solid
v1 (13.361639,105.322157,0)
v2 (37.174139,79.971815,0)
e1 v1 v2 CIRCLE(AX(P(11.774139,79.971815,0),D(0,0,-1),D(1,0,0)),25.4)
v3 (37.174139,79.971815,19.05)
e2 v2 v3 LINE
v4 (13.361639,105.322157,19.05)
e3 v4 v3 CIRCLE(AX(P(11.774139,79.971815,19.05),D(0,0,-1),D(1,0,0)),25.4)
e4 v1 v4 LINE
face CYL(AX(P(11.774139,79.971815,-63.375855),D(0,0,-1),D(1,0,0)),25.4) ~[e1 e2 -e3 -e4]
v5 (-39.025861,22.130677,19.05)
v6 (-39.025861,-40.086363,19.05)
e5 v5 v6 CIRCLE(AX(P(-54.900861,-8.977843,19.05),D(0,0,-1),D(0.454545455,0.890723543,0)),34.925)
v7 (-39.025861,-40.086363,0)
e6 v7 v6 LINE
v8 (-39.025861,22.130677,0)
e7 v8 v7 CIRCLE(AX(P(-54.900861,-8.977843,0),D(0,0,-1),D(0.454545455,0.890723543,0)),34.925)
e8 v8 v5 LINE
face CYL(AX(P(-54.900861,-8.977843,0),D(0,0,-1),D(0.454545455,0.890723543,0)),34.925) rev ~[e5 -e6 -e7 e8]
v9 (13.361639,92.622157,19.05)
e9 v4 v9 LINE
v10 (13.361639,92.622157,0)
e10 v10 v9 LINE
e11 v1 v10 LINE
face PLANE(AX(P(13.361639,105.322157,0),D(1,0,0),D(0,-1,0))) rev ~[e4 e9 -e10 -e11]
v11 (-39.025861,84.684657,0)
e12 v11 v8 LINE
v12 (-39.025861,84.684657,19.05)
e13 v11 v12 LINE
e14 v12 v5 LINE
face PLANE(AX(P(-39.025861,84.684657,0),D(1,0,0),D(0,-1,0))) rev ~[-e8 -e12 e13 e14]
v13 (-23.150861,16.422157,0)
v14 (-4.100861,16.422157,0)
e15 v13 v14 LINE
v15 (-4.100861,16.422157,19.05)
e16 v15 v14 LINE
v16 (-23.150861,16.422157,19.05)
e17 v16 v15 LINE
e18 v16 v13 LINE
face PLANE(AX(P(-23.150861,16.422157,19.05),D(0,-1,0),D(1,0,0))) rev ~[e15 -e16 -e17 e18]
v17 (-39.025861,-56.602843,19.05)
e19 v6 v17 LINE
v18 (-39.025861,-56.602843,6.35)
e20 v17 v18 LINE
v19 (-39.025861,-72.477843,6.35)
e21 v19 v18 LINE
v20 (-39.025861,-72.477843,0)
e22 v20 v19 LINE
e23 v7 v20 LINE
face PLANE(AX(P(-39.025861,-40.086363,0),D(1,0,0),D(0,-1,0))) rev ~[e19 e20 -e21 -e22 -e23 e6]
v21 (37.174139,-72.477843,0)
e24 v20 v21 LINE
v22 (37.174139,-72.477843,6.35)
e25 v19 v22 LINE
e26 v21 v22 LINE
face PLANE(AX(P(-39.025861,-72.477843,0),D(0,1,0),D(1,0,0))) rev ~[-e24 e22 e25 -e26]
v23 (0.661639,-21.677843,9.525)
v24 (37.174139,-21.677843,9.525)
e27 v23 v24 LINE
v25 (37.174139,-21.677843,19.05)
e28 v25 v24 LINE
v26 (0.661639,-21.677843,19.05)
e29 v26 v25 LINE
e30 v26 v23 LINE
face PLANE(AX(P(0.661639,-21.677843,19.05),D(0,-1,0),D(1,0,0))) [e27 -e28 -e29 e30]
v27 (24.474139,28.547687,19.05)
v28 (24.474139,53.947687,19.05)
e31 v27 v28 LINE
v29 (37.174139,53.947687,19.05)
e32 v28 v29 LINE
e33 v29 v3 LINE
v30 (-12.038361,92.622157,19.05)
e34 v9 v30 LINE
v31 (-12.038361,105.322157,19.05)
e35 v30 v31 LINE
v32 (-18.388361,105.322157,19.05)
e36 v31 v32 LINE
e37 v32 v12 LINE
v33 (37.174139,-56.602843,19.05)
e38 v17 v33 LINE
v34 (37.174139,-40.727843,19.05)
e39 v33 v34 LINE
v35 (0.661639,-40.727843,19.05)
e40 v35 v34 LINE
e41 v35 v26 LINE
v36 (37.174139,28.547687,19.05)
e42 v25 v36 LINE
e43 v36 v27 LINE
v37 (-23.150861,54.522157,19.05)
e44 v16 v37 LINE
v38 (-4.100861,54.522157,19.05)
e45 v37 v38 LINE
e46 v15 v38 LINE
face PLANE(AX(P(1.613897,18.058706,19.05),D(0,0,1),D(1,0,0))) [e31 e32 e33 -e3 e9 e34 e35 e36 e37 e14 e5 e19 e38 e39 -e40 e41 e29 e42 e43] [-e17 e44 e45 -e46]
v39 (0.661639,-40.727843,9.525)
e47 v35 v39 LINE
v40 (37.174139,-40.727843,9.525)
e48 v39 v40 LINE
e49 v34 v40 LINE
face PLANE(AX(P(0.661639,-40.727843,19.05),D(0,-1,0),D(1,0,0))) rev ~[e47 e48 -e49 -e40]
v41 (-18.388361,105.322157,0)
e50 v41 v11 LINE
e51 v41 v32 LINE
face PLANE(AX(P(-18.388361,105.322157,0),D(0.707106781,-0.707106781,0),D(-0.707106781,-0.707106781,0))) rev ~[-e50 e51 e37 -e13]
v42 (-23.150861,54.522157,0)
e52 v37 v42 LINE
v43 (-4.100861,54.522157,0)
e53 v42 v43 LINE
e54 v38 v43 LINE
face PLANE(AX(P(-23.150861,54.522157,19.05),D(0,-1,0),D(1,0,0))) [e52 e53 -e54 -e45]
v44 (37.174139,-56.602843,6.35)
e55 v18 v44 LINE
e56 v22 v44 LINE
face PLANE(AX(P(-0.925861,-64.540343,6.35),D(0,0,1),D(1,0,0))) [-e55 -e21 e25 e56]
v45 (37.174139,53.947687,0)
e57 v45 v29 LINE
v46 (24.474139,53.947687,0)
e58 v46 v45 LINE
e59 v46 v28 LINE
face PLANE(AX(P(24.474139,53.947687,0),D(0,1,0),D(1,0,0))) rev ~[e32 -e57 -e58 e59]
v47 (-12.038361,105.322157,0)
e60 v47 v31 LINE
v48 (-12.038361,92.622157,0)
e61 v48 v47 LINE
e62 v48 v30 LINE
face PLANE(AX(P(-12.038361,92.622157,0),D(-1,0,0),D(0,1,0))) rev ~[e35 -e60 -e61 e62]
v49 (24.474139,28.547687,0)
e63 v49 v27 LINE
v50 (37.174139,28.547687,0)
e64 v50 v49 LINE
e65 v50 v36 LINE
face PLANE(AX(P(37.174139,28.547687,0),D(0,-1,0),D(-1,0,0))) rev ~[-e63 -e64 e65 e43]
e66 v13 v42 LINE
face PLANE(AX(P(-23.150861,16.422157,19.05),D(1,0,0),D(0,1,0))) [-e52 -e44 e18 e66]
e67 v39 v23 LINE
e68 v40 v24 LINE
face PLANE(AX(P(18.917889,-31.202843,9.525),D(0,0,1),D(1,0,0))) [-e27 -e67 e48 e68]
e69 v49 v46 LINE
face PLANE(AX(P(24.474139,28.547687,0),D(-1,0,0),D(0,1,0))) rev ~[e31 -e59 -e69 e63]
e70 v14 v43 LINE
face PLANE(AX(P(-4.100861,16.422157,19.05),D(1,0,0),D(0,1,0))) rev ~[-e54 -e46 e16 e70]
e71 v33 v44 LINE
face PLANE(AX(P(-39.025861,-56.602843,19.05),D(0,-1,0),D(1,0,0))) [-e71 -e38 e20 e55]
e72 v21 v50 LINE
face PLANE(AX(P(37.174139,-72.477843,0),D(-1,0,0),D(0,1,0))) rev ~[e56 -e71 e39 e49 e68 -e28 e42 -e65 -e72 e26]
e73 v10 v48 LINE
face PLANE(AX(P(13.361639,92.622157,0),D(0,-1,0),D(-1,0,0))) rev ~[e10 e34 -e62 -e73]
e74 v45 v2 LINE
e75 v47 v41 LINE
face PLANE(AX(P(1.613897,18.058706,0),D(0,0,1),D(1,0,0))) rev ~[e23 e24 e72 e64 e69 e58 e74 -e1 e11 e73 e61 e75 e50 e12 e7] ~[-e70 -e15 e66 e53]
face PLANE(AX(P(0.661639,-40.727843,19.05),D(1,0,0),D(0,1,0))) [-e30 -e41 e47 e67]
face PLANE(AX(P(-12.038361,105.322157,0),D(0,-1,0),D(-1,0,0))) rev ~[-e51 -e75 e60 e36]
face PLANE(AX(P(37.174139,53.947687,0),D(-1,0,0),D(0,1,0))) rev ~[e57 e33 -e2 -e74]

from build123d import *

# Parameters (mm, degrees)
F1_DEPTH    = 19.05
F2_W        = 76.2
F2_H        = 15.875
F3_DEPTH    = 12.7
F4_W        = 36.5125
F4_H        = 19.05
F5_DEPTH    = 9.525
F6_W        = 19.05
F6_H        = 38.1
F7_DEPTH    = 25.4
F8_T1_DEPTH = 145.8017104175


# Not quite as in the source:
# - a fillet or chamfer that OpenCascade refuses, or shapes differently, is made with other operations: its cross-section is extruded or revolved along the edge and cut away or added


with BuildPart() as f1:
    # F0 (on Top) → F1 (new body)
    with BuildSketch(Plane.XY):
        with BuildLine():
            Line((-39.025861299, -56.6028431063), (-39.025861299, -72.4778431063))
            Line((-39.025861299, -72.4778431063), (37.174138701, -72.4778431063))
            Line((37.174138701, -72.4778431063), (37.174138701, 28.547687456))
            Line((37.174138701, 28.547687456), (24.474138701, 28.547687456))
            Line((24.474138701, 28.547687456), (24.474138701, 53.947687456))
            Line((24.474138701, 53.947687456), (37.174138701, 53.947687456))
            Line((37.174138701, 53.947687456), (37.174138701, 105.3221568937))
            Line((37.174138701, 105.3221568937), (13.361638701, 105.3221568937))
            Line((13.361638701, 105.3221568937), (13.361638701, 92.6221568937))
            Line((13.361638701, 92.6221568937), (-12.038361299, 92.6221568937))
            Line((-12.038361299, 92.6221568937), (-12.038361299, 105.3221568937))
            Line((-12.038361299, 105.3221568937), (-18.388361299, 105.3221568937))
            Line((-18.388361299, 105.3221568937), (-39.025861299, 84.6846568937))
            Line((-39.025861299, 84.6846568937), (-39.025861299, 22.130676627))
            ThreePointArc((-39.025861299, 22.130676627), (-19.975861299, -8.9778431063), (-39.025861299, -40.0863628397))
            Line((-39.025861299, -40.0863628397), (-39.025861299, -40.7278431063))
            Line((-39.025861299, -40.7278431063), (-39.025861299, -56.6028431063))
        make_face()
    extrude(amount=F1_DEPTH)

    # F2 (on face) → F3 (cut)
    with BuildSketch(Plane.XY.offset(19.05)):
        with Locations((-0.925861299, -64.5403431063)):
            Rectangle(F2_W, F2_H)
    extrude(amount=-F3_DEPTH, mode=Mode.SUBTRACT)

    # F4 (on face) → F5 (cut)
    with BuildSketch(Plane.XY.offset(19.05)):
        with Locations((18.917888701, -31.2028431063)):
            Rectangle(F4_W, F4_H)
    extrude(amount=-F5_DEPTH, mode=Mode.SUBTRACT)

    # F6 (on face) → F7 (cut)
    with BuildSketch(Plane.XY.offset(19.05)):
        with Locations((-13.625861299, 35.4721568937)):
            Rectangle(F6_W, F6_H)
    extrude(amount=-F7_DEPTH, mode=Mode.SUBTRACT)

    # F8: fillet of radius 25.4 on 1 edges, made by hand

    # F8_s2 → F8_t1 (cut)
    with BuildSketch(Plane.XY.offset(-63.3758552087)):
        with BuildLine():
            ThreePointArc((37.174138701, 79.9718148102), (30.2874109671, 97.3620060109), (13.361638701, 105.3221568937))
            Line((13.361638701, 105.3221568937), (37.174138701, 105.3221568937))
            Line((37.174138701, 105.3221568937), (37.174138701, 79.9718148102))
        make_face()
    extrude(amount=F8_T1_DEPTH, mode=Mode.SUBTRACT)


solid = f1.part
